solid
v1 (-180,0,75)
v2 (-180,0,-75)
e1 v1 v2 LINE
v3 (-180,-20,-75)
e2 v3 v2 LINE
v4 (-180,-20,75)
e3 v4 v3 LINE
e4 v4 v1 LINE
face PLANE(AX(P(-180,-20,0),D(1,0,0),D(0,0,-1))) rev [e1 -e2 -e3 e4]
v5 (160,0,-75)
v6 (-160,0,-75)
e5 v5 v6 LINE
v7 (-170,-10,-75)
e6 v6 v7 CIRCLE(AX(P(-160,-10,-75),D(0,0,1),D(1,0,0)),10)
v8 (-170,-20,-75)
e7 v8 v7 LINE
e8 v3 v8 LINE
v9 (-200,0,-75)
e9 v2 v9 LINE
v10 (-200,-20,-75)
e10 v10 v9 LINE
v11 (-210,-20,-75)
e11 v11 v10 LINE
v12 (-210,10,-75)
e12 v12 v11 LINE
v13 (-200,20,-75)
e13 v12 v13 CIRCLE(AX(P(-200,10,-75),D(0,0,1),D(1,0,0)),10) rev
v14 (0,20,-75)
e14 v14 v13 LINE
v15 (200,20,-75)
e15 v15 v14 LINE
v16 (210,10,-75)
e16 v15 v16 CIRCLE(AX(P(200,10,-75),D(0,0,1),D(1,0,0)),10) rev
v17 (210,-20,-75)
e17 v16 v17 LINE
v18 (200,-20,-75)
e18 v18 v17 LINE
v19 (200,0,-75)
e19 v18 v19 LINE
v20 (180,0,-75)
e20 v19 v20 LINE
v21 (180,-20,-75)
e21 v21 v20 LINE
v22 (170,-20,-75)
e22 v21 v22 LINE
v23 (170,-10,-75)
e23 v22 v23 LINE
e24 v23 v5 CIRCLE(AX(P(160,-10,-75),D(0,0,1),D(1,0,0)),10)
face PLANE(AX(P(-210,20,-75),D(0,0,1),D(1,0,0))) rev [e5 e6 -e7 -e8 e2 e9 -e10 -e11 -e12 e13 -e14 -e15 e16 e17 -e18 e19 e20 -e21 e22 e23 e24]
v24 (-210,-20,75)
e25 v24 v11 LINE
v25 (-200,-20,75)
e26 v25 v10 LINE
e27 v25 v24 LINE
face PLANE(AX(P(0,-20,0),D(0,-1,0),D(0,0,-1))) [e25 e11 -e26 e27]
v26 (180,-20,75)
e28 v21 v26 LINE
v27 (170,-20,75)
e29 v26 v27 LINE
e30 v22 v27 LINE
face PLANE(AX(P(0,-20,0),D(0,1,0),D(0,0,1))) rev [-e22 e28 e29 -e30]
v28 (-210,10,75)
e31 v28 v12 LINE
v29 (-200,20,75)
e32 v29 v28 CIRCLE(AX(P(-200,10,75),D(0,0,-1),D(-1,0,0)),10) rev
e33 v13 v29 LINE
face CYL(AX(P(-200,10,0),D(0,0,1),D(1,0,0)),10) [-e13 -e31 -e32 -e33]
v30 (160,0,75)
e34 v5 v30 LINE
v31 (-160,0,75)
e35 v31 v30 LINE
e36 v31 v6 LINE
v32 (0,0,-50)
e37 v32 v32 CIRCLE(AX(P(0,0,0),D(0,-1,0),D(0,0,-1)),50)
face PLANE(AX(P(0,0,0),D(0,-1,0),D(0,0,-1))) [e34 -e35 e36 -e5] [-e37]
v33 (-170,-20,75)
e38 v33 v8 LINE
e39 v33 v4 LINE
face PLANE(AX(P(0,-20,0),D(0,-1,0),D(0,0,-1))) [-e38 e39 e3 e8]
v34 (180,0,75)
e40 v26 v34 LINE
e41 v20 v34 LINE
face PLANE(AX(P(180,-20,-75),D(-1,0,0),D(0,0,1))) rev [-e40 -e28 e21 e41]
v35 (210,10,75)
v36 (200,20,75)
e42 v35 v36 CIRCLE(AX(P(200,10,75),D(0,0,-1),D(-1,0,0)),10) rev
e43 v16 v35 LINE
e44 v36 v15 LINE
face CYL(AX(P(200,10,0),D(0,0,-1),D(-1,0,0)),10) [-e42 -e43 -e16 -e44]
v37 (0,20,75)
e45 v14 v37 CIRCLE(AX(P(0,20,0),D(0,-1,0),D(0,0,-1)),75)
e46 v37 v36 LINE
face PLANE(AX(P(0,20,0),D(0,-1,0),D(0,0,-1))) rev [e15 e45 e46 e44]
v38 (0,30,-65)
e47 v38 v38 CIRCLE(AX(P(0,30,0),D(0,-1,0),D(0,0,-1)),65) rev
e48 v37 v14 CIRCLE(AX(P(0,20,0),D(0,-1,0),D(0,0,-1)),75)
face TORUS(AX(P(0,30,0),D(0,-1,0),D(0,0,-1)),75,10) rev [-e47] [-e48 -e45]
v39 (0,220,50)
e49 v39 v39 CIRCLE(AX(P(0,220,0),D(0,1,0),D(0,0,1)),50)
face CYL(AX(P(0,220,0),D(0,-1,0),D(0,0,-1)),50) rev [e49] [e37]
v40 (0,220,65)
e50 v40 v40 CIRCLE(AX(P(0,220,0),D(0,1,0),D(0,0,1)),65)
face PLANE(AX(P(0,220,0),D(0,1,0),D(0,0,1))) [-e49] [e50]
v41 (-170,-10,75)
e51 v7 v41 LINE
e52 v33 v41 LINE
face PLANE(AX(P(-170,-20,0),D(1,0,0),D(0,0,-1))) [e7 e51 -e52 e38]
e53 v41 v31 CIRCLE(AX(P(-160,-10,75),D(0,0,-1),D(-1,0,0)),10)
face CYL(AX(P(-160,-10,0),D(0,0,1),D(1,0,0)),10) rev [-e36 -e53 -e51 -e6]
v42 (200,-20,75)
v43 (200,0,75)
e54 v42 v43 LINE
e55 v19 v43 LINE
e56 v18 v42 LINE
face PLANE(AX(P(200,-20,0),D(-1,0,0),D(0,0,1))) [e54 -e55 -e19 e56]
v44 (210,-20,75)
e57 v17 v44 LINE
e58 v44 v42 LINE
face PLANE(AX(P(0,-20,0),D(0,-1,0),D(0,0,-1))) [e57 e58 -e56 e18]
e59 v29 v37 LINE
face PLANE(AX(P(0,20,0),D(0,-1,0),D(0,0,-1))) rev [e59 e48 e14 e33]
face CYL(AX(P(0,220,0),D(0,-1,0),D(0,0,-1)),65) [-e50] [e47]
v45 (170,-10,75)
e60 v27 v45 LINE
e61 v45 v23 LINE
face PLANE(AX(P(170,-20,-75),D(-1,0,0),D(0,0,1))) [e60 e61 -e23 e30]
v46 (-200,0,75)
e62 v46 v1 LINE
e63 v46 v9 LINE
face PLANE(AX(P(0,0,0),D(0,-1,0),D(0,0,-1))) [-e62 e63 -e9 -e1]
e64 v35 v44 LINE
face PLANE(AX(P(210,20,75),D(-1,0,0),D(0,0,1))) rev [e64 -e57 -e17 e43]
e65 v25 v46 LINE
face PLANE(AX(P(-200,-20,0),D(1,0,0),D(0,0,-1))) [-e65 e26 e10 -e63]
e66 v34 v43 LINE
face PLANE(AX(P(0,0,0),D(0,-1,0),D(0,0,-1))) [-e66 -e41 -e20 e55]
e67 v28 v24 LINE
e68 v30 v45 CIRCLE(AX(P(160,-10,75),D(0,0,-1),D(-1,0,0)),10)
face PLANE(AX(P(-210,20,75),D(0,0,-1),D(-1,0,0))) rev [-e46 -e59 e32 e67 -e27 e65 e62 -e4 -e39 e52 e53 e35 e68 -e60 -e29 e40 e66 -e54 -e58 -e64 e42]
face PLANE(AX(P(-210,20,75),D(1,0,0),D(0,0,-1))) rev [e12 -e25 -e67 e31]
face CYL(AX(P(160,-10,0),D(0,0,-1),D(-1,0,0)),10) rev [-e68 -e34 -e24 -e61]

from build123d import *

# Parameters (mm, degrees)
SKETCH1_W           = 420
SKETCH1_H           = 150
BOSS_EXTRUDE1_DEPTH = 20
SKETCH2_W           = 10
SKETCH2_H           = 150
BOSS_EXTRUDE3_DEPTH = 20
FILLET1_R           = 10
FILLET2_R           = 10
FILLET3_R           = 10
FILLET4_R           = 10
SKETCH3_R           = 65
SKETCH3_R_2         = 50
BOSS_EXTRUDE4_DEPTH = 200
FILLET5_R           = 10
CUT_EXTRUDE1_START  = -327
SKETCH4_R           = 50
CUT_EXTRUDE1_DEPTH  = 327


with BuildPart() as part:
    # Sketch1 → Boss-Extrude1 (new body)
    with BuildSketch(Plane(origin=(0, 0, 0), x_dir=(1, 0, 0), z_dir=(0, 1, 0))):
        Rectangle(SKETCH1_W, SKETCH1_H)
    extrude(amount=BOSS_EXTRUDE1_DEPTH)

    # Sketch2 → Boss-Extrude3 (add)
    with BuildSketch(Plane.XZ):
        with Locations((-205, 0)):
            Rectangle(SKETCH2_W, SKETCH2_H)
        with Locations((-175, 0)):
            Rectangle(SKETCH2_W, SKETCH2_H)
        with Locations((205, 0)):
            Rectangle(SKETCH2_W, SKETCH2_H)
        with Locations((175, 0)):
            Rectangle(SKETCH2_W, SKETCH2_H)
    extrude(amount=BOSS_EXTRUDE3_DEPTH)

    # Fillet1
    fillet1_edges = [part.edges().sort_by_distance(p)[0] for p in [
        (-170, 0, 0),
    ]]
    fillet(fillet1_edges, radius=FILLET1_R)

    # Fillet2
    fillet2_edges = [part.edges().sort_by_distance(p)[0] for p in [
        (170, 0, 0),
    ]]
    fillet(fillet2_edges, radius=FILLET2_R)

    # Fillet3
    fillet3_edges = [part.edges().sort_by_distance(p)[0] for p in [
        (210, 20, 0),
    ]]
    fillet(fillet3_edges, radius=FILLET3_R)

    # Fillet4
    fillet4_edges = [part.edges().sort_by_distance(p)[0] for p in [
        (-210, 20, 0),
    ]]
    fillet(fillet4_edges, radius=FILLET4_R)

    # Sketch3 → Boss-Extrude4 (add)
    with BuildSketch(Plane(origin=(0, 20, 0), x_dir=(1, 0, 0), z_dir=(0, 1, 0))):
        with Locations(Location((0, 0, 0), (0, 0, 90))):
            Circle(SKETCH3_R)
        with Locations(Location((0, 0, 0), (0, 0, 270))):
            Circle(SKETCH3_R_2, mode=Mode.SUBTRACT)
    extrude(amount=BOSS_EXTRUDE4_DEPTH)

    # Fillet5
    fillet5_edges = [part.edges().sort_by_distance(p)[0] for p in [
        (0, 20, 65),
    ]]
    fillet(fillet5_edges, radius=FILLET5_R - 0.0001)  # a hair under: the kernel refuses the full size

    # Sketch4 → Cut-Extrude1 (cut)
    with BuildSketch(Plane(origin=(0, 220, 0), x_dir=(1, 0, 0), z_dir=(0, 1, 0)).offset(CUT_EXTRUDE1_START)):
        with Locations(Location((0, 0, 0), (0, 0, 90))):
            Circle(SKETCH4_R)
    extrude(amount=CUT_EXTRUDE1_DEPTH, mode=Mode.SUBTRACT)


solid = part.part
